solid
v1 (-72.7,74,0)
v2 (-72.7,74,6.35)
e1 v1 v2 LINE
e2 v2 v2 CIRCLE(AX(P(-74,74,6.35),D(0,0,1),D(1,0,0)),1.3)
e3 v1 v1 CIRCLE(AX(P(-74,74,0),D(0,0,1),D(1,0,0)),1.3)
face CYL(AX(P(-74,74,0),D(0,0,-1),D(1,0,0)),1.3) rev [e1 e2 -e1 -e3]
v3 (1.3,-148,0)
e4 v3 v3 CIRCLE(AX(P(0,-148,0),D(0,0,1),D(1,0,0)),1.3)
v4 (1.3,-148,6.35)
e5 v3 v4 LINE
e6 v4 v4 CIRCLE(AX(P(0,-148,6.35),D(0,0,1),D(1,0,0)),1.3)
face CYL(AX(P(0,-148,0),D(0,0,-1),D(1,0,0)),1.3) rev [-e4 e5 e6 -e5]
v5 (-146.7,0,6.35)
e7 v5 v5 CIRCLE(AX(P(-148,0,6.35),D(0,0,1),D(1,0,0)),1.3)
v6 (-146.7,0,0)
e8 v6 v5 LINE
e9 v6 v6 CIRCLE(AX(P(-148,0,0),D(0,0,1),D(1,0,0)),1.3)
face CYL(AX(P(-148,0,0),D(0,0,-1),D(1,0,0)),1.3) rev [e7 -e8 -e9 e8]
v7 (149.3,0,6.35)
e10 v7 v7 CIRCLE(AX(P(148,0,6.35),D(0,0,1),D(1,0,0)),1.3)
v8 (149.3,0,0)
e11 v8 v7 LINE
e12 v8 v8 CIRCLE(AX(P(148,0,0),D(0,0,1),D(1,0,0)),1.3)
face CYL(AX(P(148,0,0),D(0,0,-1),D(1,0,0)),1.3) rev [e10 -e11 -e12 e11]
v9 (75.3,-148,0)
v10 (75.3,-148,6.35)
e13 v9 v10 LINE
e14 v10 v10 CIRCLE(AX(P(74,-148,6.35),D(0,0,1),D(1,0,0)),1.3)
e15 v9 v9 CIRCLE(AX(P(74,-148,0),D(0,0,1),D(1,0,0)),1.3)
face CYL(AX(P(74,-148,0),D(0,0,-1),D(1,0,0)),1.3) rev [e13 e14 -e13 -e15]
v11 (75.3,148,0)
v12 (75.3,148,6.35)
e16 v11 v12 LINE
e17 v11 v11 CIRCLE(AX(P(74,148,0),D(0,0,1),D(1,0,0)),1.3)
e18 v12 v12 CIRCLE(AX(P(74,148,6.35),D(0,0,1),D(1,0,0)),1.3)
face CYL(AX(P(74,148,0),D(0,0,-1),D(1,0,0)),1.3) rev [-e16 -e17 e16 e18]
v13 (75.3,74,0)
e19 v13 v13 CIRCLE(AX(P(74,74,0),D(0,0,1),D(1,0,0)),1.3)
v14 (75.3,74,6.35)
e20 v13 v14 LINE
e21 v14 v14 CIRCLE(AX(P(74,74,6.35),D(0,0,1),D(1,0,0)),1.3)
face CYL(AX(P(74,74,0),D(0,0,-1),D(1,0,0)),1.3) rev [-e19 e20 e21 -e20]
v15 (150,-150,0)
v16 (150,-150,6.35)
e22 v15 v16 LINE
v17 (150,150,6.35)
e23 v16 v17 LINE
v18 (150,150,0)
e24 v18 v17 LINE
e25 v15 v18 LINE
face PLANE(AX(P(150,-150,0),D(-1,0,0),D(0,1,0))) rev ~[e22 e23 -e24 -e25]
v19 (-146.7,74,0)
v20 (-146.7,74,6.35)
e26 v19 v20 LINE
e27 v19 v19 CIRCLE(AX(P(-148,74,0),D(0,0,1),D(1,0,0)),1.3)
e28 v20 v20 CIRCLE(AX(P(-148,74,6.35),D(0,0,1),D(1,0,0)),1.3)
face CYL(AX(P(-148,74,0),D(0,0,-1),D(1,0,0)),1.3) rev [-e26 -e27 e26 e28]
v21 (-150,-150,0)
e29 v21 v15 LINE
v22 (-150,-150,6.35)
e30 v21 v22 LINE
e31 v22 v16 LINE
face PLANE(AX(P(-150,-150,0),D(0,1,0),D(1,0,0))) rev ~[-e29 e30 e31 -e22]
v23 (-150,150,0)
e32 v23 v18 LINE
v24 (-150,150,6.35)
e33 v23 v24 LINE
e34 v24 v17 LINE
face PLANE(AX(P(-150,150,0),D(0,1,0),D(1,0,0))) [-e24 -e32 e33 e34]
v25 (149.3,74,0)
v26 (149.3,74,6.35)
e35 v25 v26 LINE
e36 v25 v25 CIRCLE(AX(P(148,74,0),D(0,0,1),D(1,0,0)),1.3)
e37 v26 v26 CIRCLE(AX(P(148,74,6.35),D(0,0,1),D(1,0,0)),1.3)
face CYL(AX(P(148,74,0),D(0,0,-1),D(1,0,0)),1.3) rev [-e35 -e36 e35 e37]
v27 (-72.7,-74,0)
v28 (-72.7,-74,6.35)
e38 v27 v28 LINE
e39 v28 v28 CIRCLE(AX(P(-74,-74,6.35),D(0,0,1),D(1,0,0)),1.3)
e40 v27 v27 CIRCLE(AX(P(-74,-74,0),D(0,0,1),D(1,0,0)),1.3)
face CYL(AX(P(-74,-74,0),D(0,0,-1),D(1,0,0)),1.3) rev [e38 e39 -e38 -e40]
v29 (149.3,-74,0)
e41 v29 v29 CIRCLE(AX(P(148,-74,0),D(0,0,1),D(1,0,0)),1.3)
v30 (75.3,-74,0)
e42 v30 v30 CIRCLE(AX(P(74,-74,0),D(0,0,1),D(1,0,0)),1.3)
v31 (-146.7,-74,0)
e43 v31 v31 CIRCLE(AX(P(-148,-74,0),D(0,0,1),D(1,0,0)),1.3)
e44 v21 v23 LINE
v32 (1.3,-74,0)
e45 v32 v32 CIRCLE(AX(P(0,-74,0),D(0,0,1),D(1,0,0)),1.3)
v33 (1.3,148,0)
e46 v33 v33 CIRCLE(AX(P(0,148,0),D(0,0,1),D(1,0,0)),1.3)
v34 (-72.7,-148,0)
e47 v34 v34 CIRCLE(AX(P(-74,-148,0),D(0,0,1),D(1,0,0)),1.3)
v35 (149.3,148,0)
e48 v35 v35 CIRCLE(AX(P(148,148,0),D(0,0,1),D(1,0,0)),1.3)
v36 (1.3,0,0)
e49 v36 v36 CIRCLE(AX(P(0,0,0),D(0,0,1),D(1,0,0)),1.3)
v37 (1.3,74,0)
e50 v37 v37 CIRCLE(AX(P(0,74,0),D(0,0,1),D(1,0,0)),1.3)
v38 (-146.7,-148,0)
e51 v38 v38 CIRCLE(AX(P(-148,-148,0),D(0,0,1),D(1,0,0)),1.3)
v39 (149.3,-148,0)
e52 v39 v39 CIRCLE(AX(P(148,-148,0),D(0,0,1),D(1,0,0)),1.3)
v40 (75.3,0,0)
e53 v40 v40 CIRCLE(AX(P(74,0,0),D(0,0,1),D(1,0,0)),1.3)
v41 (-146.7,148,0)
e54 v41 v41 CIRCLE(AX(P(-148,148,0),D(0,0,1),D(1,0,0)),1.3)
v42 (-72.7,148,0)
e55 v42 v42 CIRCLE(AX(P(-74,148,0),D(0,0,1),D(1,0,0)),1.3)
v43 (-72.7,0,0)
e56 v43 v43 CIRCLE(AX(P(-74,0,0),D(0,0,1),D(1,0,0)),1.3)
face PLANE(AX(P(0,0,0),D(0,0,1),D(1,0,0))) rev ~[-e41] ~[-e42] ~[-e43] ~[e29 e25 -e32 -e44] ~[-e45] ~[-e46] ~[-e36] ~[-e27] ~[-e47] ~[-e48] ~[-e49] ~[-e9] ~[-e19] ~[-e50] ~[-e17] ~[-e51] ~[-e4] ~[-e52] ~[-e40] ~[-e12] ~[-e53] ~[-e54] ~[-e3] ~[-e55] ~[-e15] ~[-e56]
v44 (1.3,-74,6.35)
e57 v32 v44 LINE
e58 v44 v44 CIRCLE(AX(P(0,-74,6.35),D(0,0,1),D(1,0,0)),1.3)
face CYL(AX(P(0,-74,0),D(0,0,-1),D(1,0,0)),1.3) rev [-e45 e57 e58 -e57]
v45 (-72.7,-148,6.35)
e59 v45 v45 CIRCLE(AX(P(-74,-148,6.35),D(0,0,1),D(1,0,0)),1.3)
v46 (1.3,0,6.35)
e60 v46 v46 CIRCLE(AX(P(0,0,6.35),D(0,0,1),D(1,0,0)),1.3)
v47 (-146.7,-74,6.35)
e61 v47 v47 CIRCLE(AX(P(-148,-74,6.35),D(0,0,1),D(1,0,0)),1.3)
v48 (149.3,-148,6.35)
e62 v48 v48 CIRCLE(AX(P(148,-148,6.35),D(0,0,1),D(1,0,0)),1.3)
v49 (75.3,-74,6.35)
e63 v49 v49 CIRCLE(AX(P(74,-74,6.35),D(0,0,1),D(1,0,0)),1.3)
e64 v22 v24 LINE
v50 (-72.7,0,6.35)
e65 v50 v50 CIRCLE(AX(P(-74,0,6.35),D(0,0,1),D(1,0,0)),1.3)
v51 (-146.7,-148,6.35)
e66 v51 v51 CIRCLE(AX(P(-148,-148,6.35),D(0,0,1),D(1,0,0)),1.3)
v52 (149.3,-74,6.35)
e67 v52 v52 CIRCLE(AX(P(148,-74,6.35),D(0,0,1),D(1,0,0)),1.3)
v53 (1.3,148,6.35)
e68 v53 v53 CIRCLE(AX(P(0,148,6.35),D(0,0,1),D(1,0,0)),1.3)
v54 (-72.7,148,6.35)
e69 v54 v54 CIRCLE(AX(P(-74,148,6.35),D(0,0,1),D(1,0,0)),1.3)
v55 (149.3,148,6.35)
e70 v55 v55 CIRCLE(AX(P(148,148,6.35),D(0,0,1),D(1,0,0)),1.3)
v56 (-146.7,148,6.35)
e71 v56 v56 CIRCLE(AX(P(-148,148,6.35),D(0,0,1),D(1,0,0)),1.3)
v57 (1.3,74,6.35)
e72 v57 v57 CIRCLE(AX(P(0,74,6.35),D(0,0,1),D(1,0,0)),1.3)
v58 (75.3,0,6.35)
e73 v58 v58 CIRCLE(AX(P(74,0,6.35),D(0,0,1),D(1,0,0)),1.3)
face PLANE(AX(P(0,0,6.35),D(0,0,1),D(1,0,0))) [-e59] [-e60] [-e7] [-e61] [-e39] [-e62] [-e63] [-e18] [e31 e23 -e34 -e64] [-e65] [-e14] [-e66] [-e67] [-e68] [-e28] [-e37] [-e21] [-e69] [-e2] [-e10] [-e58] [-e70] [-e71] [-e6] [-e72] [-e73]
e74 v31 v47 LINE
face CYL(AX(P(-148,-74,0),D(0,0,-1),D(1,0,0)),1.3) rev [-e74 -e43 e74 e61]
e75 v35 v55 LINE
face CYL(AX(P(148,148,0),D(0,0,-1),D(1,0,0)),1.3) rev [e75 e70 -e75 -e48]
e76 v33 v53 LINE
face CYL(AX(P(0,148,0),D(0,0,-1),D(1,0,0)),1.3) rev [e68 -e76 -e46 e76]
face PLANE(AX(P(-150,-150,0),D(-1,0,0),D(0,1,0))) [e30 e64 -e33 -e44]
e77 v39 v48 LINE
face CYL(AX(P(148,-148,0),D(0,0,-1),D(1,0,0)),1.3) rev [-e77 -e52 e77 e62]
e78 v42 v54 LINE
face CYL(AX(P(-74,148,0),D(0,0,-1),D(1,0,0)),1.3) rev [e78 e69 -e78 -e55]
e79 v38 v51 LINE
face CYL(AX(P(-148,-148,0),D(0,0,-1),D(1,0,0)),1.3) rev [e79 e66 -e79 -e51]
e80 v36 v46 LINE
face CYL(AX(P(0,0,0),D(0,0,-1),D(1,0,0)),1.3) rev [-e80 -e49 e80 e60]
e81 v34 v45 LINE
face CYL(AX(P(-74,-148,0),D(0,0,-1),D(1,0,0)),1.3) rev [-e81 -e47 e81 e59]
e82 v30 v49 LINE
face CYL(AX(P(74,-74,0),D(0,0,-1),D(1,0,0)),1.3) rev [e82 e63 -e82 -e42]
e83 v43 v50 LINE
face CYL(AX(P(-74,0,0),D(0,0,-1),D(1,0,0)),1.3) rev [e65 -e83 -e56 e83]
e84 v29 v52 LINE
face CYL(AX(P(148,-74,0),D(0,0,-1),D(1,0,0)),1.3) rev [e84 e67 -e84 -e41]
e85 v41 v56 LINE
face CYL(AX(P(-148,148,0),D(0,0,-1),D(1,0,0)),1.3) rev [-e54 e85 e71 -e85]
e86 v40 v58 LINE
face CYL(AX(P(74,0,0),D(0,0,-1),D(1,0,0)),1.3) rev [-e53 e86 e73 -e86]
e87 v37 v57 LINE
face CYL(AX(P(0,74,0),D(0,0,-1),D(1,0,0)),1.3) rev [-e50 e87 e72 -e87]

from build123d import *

# Parameters (mm, degrees)
F0_W     = 300
F0_H     = 300
F0_R     = 1.3
F1_DEPTH = 6.35


# Not quite as in the source:
# - a length typed as a fraction of an inch, garbled in the dataset ("3 / 203.2 mm" for 3/8 in), is restored


with BuildPart() as f1:
    # F0 (on Top) → F1 (new body)
    with BuildSketch(Plane.XY):
        Rectangle(F0_W, F0_H)
        with Locations((-148, -148)):
            Circle(F0_R, mode=Mode.SUBTRACT)
        with Locations((-74, -148)):
            Circle(F0_R, mode=Mode.SUBTRACT)
        with Locations((-148, -74)):
            Circle(F0_R, mode=Mode.SUBTRACT)
        with Locations((-74, -74)):
            Circle(F0_R, mode=Mode.SUBTRACT)
        with Locations((0, -148)):
            Circle(F0_R, mode=Mode.SUBTRACT)
        with Locations((74, -148)):
            Circle(F0_R, mode=Mode.SUBTRACT)
        with Locations((148, -148)):
            Circle(F0_R, mode=Mode.SUBTRACT)
        with Locations((0, -74)):
            Circle(F0_R, mode=Mode.SUBTRACT)
        with Locations((74, -74)):
            Circle(F0_R, mode=Mode.SUBTRACT)
        with Locations((148, -74)):
            Circle(F0_R, mode=Mode.SUBTRACT)
        with Locations((-148, 0)):
            Circle(F0_R, mode=Mode.SUBTRACT)
        with Locations((-148, 74)):
            Circle(F0_R, mode=Mode.SUBTRACT)
        with Locations((-74, 0)):
            Circle(F0_R, mode=Mode.SUBTRACT)
        with Locations((-74, 74)):
            Circle(F0_R, mode=Mode.SUBTRACT)
        with Locations((-148, 148)):
            Circle(F0_R, mode=Mode.SUBTRACT)
        with Locations((-74, 148)):
            Circle(F0_R, mode=Mode.SUBTRACT)
        Circle(F0_R, mode=Mode.SUBTRACT)
        with Locations((74, 0)):
            Circle(F0_R, mode=Mode.SUBTRACT)
        with Locations((0, 74)):
            Circle(F0_R, mode=Mode.SUBTRACT)
        with Locations((74, 74)):
            Circle(F0_R, mode=Mode.SUBTRACT)
        with Locations((148, 0)):
            Circle(F0_R, mode=Mode.SUBTRACT)
        with Locations((148, 74)):
            Circle(F0_R, mode=Mode.SUBTRACT)
        with Locations((0, 148)):
            Circle(F0_R, mode=Mode.SUBTRACT)
        with Locations((74, 148)):
            Circle(F0_R, mode=Mode.SUBTRACT)
        with Locations((148, 148)):
            Circle(F0_R, mode=Mode.SUBTRACT)
    extrude(amount=F1_DEPTH)


solid = f1.part
